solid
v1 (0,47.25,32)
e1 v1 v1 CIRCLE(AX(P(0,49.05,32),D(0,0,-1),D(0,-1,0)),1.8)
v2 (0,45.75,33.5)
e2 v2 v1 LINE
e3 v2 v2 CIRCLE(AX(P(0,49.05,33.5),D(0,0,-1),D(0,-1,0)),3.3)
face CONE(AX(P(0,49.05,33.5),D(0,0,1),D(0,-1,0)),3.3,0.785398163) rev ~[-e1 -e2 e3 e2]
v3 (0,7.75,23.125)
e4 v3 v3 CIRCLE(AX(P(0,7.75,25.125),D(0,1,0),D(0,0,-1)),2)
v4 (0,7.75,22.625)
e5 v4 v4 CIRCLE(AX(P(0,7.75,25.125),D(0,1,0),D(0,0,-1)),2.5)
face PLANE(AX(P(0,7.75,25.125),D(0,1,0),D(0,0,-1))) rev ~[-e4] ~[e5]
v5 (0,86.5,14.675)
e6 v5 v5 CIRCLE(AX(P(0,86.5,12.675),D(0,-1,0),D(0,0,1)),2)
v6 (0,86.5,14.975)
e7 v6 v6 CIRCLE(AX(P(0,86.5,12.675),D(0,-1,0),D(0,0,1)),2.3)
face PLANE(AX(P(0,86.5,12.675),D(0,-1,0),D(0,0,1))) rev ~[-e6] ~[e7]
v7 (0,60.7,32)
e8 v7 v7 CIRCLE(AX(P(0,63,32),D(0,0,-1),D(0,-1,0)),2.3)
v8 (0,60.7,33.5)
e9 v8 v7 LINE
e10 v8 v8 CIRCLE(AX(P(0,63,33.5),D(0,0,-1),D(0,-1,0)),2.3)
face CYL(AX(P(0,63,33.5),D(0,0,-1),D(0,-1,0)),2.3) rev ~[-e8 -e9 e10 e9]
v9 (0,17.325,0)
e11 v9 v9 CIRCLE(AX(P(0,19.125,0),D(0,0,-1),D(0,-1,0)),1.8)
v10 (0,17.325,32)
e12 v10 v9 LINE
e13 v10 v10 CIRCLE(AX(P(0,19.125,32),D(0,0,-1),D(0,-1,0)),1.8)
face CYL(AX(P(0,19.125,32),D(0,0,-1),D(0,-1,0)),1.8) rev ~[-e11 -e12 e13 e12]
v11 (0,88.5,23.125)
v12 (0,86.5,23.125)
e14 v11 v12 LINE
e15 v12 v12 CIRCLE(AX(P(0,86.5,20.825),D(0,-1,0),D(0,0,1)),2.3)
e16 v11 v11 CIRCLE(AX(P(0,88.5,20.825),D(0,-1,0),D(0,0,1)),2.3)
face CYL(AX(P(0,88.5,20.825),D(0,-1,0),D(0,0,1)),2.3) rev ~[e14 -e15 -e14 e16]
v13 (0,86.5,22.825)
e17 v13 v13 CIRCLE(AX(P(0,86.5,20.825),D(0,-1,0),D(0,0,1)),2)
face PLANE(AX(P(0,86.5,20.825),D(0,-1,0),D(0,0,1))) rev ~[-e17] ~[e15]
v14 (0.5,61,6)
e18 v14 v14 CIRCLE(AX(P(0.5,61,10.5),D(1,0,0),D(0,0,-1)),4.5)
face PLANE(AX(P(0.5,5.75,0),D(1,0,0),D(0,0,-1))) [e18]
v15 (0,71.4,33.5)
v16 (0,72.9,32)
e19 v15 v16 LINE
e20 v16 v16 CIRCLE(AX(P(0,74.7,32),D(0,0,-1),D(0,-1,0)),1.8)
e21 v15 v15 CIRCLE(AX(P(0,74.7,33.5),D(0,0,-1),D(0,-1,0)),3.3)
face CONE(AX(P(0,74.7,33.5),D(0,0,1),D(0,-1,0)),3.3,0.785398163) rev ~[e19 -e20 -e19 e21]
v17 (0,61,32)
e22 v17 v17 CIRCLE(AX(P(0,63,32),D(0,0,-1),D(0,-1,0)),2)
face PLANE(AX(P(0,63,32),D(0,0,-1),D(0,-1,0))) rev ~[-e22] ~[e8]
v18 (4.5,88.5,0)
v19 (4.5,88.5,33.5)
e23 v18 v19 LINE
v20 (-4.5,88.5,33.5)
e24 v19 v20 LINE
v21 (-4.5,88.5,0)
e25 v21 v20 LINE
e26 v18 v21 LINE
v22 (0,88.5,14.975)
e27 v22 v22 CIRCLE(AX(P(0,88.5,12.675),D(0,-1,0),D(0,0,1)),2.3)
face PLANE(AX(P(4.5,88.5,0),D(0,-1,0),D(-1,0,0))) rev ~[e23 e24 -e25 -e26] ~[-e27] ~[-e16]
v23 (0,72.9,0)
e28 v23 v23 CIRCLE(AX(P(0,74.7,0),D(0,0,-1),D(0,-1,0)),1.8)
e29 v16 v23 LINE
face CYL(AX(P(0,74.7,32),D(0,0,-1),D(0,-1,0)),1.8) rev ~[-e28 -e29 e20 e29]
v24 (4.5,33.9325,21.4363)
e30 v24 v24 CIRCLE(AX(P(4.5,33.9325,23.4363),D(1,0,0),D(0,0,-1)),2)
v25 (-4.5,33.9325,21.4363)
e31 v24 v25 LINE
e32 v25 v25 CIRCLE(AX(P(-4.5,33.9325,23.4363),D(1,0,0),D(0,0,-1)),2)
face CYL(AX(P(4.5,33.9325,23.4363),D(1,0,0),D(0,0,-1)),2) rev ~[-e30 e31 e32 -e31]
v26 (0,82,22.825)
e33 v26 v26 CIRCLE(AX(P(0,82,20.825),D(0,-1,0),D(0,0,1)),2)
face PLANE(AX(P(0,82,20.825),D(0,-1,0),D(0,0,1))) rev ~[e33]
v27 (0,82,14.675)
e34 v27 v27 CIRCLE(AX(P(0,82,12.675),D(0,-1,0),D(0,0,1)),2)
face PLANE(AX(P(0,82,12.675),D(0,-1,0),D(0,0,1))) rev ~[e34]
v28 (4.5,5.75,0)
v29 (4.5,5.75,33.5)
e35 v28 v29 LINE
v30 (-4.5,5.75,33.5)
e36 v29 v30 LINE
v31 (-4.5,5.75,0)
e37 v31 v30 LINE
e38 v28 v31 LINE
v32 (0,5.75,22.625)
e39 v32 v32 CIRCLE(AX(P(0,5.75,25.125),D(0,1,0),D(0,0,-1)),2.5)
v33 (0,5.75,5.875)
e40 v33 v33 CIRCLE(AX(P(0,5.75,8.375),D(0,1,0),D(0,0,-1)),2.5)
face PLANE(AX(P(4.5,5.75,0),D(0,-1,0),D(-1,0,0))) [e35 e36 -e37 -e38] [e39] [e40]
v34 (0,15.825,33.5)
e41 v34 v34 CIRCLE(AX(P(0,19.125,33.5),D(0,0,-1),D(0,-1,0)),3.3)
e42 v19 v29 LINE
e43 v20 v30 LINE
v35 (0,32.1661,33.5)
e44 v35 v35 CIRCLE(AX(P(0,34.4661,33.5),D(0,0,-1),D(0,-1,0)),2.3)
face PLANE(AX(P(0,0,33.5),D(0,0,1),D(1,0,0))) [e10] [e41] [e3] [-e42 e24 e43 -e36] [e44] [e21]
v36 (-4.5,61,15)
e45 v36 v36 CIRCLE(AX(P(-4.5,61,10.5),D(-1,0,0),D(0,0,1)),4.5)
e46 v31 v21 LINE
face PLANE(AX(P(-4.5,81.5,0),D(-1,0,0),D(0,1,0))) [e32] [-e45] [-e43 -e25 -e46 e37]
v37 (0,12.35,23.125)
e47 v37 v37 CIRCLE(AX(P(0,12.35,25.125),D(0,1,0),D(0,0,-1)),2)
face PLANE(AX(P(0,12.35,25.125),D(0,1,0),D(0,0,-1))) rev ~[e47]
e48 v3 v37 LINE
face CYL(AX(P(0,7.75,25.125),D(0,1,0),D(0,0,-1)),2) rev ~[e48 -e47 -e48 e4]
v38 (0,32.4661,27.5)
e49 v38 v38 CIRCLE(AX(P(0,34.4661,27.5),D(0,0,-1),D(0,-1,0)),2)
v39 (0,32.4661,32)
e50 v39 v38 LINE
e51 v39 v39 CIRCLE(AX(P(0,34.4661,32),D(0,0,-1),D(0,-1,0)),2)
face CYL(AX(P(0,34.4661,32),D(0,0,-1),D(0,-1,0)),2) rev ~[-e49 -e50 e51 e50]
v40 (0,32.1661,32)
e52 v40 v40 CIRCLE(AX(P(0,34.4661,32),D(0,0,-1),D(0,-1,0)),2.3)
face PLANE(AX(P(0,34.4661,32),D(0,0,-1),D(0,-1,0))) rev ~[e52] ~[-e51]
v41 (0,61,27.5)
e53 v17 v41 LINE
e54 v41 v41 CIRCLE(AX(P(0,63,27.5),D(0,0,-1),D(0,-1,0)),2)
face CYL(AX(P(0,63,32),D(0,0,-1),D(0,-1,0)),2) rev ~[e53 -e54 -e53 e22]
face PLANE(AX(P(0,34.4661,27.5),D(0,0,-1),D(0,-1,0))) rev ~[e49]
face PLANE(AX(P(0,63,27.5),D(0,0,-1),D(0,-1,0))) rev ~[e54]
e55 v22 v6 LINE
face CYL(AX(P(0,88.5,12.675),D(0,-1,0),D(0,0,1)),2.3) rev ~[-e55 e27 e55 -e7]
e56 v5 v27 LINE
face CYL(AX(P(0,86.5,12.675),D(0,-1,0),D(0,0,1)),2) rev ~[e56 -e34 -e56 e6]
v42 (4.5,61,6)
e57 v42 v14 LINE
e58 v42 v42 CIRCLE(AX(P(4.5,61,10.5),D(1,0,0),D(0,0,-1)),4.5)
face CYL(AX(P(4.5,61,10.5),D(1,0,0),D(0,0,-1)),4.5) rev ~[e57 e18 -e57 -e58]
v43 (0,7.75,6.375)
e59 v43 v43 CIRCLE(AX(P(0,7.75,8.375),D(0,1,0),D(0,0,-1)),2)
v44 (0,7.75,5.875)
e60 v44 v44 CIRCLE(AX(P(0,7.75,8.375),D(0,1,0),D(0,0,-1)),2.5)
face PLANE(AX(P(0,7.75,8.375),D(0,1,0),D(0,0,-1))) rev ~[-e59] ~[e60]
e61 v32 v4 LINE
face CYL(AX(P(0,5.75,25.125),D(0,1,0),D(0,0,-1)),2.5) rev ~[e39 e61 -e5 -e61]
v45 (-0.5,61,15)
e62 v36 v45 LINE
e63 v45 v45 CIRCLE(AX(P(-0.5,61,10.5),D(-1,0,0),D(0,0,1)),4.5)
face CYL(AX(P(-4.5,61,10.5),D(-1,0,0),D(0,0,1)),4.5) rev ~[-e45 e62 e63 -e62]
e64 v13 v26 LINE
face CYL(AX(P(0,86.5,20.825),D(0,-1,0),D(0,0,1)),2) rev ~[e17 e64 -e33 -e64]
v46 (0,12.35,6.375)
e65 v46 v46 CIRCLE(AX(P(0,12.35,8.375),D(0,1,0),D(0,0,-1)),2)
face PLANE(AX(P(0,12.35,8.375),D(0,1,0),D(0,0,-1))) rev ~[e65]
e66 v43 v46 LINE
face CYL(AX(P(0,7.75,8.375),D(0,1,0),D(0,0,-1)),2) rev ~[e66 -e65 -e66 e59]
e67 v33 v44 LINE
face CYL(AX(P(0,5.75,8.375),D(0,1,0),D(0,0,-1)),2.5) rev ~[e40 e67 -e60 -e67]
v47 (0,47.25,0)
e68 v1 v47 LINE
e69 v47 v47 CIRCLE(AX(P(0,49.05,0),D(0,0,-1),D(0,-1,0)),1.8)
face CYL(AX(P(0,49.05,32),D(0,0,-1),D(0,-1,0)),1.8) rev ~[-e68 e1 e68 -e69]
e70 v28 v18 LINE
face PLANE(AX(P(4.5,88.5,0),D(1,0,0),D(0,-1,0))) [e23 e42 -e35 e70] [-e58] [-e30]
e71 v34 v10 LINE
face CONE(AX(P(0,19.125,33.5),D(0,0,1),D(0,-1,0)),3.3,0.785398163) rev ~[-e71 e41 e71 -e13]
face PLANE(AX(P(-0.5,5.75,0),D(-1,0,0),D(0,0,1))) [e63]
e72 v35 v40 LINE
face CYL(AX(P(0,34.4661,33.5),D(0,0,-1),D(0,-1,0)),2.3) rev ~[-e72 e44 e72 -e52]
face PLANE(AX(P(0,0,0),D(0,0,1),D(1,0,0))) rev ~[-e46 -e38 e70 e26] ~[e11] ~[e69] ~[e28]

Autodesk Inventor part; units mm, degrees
ref_plane "YZ Plane" through (0, 0, 0) normal (1, 0, 0) x (0, 1, 0)
ref_plane "XZ Plane" through (0, 0, 0) normal (0, 1, 0) x (-1, 0, 0)
ref_plane "Work Plane1" through (0, 0, 0) normal (0, 0, 1) x (1, 0, 0)
ref_plane "Work Plane2" through (-89, -40.3889, 33.5) normal (0, 0, 1) x (1, 0, 0)
sketch "Sketch1" plane through (0, 0, 0) normal (0, 0, 1) x (1, 0, 0)
  line L0 (23.5, 88.5) -> (-23.5, 88.5) projected
  line L1 (-23.5, 88.5) -> (-23.5, 36.5) projected
  line L2 (-26.5, 33.5) -> (-89, 33.5) projected
  line L3 (-89, 33.5) -> (-89, -72.5) projected
  line L4 (-89, -72.5) -> (-77, -72.5) projected
  line L5 (-74, -75.5) -> (-74, -93.5) projected
  line L6 (-74, -93.5) -> (74, -93.5) projected
  line L7 (74, -93.5) -> (74, -75.5) projected
  line L8 (77, -72.5) -> (89, -72.5) projected
  line L9 (89, -72.5) -> (89, 33.5) projected
  line L10 (89, 33.5) -> (26.5, 33.5) projected
  line L11 (23.5, 36.5) -> (23.5, 88.5) projected
  line L12 (-4.5, 81.5) -> (-4.5, 36.5) projected
  line L13 (-7.5, 33.5) -> (-13.5, 33.5) projected
  line L14 (-16.5, 36.5) -> (-16.5, 81.5) projected
  line L15 (-13.5, 84.5) -> (-7.5, 84.5) projected
  line L16 (16.5, 81.5) -> (16.5, 36.5) projected
  line L17 (13.5, 33.5) -> (7.5, 33.5) projected
  line L18 (4.5, 36.5) -> (4.5, 81.5) projected
  line L19 (7.5, 84.5) -> (13.5, 84.5) projected
  line L20 (-4.5, 88.5) -> (4.5, 88.5)
  line L21 (4.5, 88.5) -> (4.5, 5.75)
  line L22 (4.5, 5.75) -> (-4.5, 5.75)
  line L23 (-4.5, 5.75) -> (-4.5, 88.5)
  line L24 (-32.2, 4.75) -> (-59.9, 4.75)
  arc A0 (13.5, 33.5) -> (16.5, 36.5) centre (13.5, 36.5) ccw projected
  arc A1 (4.5, 36.5) -> (7.5, 33.5) centre (7.5, 36.5) ccw projected
  arc A2 (7.5, 84.5) -> (4.5, 81.5) centre (7.5, 81.5) ccw projected
  arc A3 (16.5, 81.5) -> (13.5, 84.5) centre (13.5, 81.5) ccw projected
  arc A4 (-4.5, 81.5) -> (-7.5, 84.5) centre (-7.5, 81.5) ccw projected
  arc A5 (-7.5, 33.5) -> (-4.5, 36.5) centre (-7.5, 36.5) ccw projected
  arc A6 (-16.5, 36.5) -> (-13.5, 33.5) centre (-13.5, 36.5) ccw projected
  arc A7 (-13.5, 84.5) -> (-16.5, 81.5) centre (-13.5, 81.5) ccw projected
  arc A8 (-26.5, 33.5) -> (-23.5, 36.5) centre (-26.5, 36.5) ccw projected
  arc A9 (-74, -75.5) -> (-77, -72.5) centre (-77, -75.5) ccw projected
  arc A10 (77, -72.5) -> (74, -75.5) centre (77, -75.5) ccw projected
  arc A11 (23.5, 36.5) -> (26.5, 33.5) centre (26.5, 36.5) ccw projected
  point P0 (0, 0)
  point P1 (-4.5, 81.5)
  point P2 (-4.5, 36.5)
  dimension "d41" = 1
extrude "Extrusion1" add sketch "Sketch1" along normal up to surface (33.5 mm away) contours L21 L18 L22 L23 L12 L0
sketch "Sketch2" plane through (4.5, 5.75, 0) normal (1, 0, 0) x (0, 0, -1)
  circle A0 centre (-23.4363, 28.1825) radius 2 projected
  point P0 (0, -5.75)
extrude "Extrusion2" cut sketch "Sketch2" against normal blind 10
sketch "Sketch3" plane through (4.5, 5.75, 0) normal (1, 0, 0) x (0, 0, -1)
  circle A0 centre (-10.5, 55.25) radius 4.5 projected
  point P0 (0, -5.75)
extrude "Extrusion3" cut sketch "Sketch3" against normal blind 4
sketch "Sketch4" plane through (-4.5, 5.75, 0) normal (-1, 0, 0) x (0, 0, 1)
  circle A0 centre (10.5, 55.25) radius 4.5 projected
  point P0 (0, -5.75)
extrude "Extrusion4" cut sketch "Sketch4" against normal blind 4
sketch "Sketch5" plane through (-4.5, 5.75, 33.5) normal (0, 0, 1) x (1, 0, 0)
  line L0 (5, 59.75) -> (5, 50.75) projected
  line L1 (4, 50.75) -> (4, 59.75) projected
  line L2 (9, 26.1825) -> (0, 26.1825) projected
  line L3 (9, 30.1825) -> (0, 30.1825) projected
  line L4 (17, 78.15) -> (-8, 78.15)
  line L5 (-8, 35.85) -> (17, 35.85)
  line L6 (9, 82.75) -> (9, 0) projected
  line L7 (0, 50.75) -> (0, 59.75) projected
  line L8 (9, 35.85) -> (0, 35.85)
  line L9 (0, 35.85) -> (0, 50.75)
  line L10 (0, 50.75) -> (9, 50.75)
  line L11 (9, 50.75) -> (9, 35.85)
  line L12 (0, 0) -> (0, 82.75) projected
  line L13 (9, 78.15) -> (0, 78.15)
  line L14 (0, 78.15) -> (0, 59.75)
  line L15 (0, 59.75) -> (9, 59.75)
  line L16 (9, 59.75) -> (9, 78.15)
  line L17 (-18, 6.625) -> (-18, 20.125) projected
  line L18 (-18, 13.375) -> (27, 13.375)
  line L19 (9, 35.85) -> (0, 50.75)
  line L20 (9, 59.75) -> (9, 50.75) projected
  line L21 (0, 35.85) -> (9, 50.75)
  line L22 (9, 59.75) -> (0, 78.15)
  line L23 (0, 59.75) -> (9, 78.15)
  point P0 (4.5, -5.75)
  point P1 (4.5, 13.375)
  point P2 (4.5, 43.3)
  point P3 (4.5, 68.95)
  dimension "d9" = 4.5
  dimension "d10" = 4.5
hole "Hole1" at (0, 19.125, 33.5) at (0, 49.05, 33.5) at (0, 74.7, 33.5) direction (0, 0, -1) diameter 3.6 end through all countersink diameter 6.6 countersink angle 90 clearance for "Countersunk Flat Head Screw ISO 2009/7046" size "M3" standard "ISO"
sketch "Sketch6" plane through (-4.5, 5.75, 0) normal (0, -1, 0) x (1, 0, 0)
  line L0 (9, 33.5) -> (0, 33.5) projected
  line L1 (0, 0) -> (0, 33.5) projected
  line L2 (0, 0) -> (9, 0) projected
  line L3 (9, 0) -> (9, 33.5) projected
  line L4 (0, 16.75) -> (9, 16.75)
  line L5 (9, 16.75) -> (0, 33.5)
  line L6 (9, 33.5) -> (0, 16.75)
  line L7 (0, 16.75) -> (9, 0)
  line L8 (9, 16.75) -> (0, 0)
  point P0 (4.5, 0)
  point P1 (4.5, 8.375)
  point P2 (4.5, 25.125)
hole "Hole2" at (0, 5.75, 8.375) at (0, 5.75, 25.125) direction (0, 1, 0) diameter 4 depth 6.6 counterbore diameter 5 counterbore depth 2
sketch "Sketch7" plane through (-4.5, 88.5, 0) normal (0, 1, 0) x (1, 0, 0)
  line L0 (0, -33.5) -> (9, -33.5) projected
  line L1 (0, -33.5) -> (9, -33.5) projected
  line L2 (9, 0) -> (9, -33.5) projected
  line L3 (9, 0) -> (0, 0) projected
  line L4 (0, 0) -> (0, -33.5) projected
  line L5 (-8, -1.4) -> (-8, -6.6) projected
  line L6 (-8, -32.1) -> (-8, -26.9) projected
  line L7 (17, -32.1) -> (17, -26.9) projected
  line L8 (17, -1.4) -> (17, -6.6) projected
  line L9 (17, -32.1) -> (-8, -32.1)
  line L10 (-8, -32.1) -> (-8, -26.9)
  line L11 (-8, -26.9) -> (17, -26.9)
  line L12 (17, -26.9) -> (17, -32.1)
  line L13 (-8, -6.6) -> (17, -6.6)
  line L14 (17, -6.6) -> (17, -1.4)
  line L15 (17, -1.4) -> (-8, -1.4)
  line L16 (-8, -1.4) -> (-8, -6.6)
  line L17 (17, -6.6) -> (-8, -6.6)
  line L18 (-8, -6.6) -> (-8, -8.6)
  line L19 (-8, -8.6) -> (17, -8.6)
  line L20 (17, -8.6) -> (17, -6.6)
  line L21 (-8, -26.9) -> (17, -26.9)
  line L22 (17, -26.9) -> (17, -24.9)
  line L23 (17, -24.9) -> (-8, -24.9)
  line L24 (-8, -24.9) -> (-8, -26.9)
  line L25 (9, 0) -> (9, -33.5) projected
  line L26 (9, -16.75) -> (0, -16.75)
  line L27 (0, 0) -> (0, -33.5) projected
  line L28 (9, -24.9) -> (0, -16.75)
  line L29 (9, -8.6) -> (0, -16.75)
  line L30 (0, -8.6) -> (9, -16.75)
  line L31 (9, -16.75) -> (0, -24.9)
  point P0 (4.5, 0)
  point P1 (4.5, -20.825)
  point P2 (4.5, -12.675)
  dimension "d25" = 2
  dimension "d26" = 2
hole "Hole3" at (0, 88.5, 20.825) at (0, 88.5, 12.675) direction (0, -1, 0) diameter 4 depth 6.5 counterbore diameter 4.6 counterbore depth 2
sketch "Sketch8" plane through (-4.5, 5.75, 33.5) normal (0, 0, 1) x (1, 0, 0)
  line L0 (26, 27.2497) -> (-17, 27.2497)
  line L1 (26, 31.2497) -> (-17, 31.2497)
  line L2 (4, 52.75) -> (-1, 52.75)
  line L3 (4, 61.75) -> (-1, 61.75)
  line L4 (10, 61.75) -> (5, 61.75)
  line L5 (9, 50.75) -> (5, 50.75) projected
  line L6 (0, 0) -> (0, 82.75) projected
  line L7 (9, 52.75) -> (0, 52.75)
  line L8 (0, 52.75) -> (0, 61.75)
  line L9 (0, 61.75) -> (9, 61.75)
  line L10 (9, 61.75) -> (9, 50.75)
  line L11 (9, 26.1825) -> (0, 26.1825) projected
  line L12 (0, 31.2497) -> (9, 31.2497)
  line L13 (9, 31.2497) -> (9, 26.1825)
  line L14 (9, 26.1825) -> (0, 26.1825)
  line L15 (0, 26.1825) -> (0, 31.2497)
  line L16 (9, 26.1825) -> (0, 31.2497)
  line L17 (0, 26.1825) -> (9, 31.2497)
  line L18 (10, 51.75) -> (0, 61.75)
  line L19 (0, 52.75) -> (9, 61.75)
  point P0 (4.5, -5.75)
  point P1 (4.5, 28.7161)
  point P2 (4.5, 57.25)
hole "Hole4" at (0, 34.4661, 33.5) at (0, 63, 33.5) direction (0, 0, -1) diameter 4 depth 6 counterbore diameter 4.6 counterbore depth 1.5
equation "\"d9\" = d10"
properties part number "middle_gear_holder"
